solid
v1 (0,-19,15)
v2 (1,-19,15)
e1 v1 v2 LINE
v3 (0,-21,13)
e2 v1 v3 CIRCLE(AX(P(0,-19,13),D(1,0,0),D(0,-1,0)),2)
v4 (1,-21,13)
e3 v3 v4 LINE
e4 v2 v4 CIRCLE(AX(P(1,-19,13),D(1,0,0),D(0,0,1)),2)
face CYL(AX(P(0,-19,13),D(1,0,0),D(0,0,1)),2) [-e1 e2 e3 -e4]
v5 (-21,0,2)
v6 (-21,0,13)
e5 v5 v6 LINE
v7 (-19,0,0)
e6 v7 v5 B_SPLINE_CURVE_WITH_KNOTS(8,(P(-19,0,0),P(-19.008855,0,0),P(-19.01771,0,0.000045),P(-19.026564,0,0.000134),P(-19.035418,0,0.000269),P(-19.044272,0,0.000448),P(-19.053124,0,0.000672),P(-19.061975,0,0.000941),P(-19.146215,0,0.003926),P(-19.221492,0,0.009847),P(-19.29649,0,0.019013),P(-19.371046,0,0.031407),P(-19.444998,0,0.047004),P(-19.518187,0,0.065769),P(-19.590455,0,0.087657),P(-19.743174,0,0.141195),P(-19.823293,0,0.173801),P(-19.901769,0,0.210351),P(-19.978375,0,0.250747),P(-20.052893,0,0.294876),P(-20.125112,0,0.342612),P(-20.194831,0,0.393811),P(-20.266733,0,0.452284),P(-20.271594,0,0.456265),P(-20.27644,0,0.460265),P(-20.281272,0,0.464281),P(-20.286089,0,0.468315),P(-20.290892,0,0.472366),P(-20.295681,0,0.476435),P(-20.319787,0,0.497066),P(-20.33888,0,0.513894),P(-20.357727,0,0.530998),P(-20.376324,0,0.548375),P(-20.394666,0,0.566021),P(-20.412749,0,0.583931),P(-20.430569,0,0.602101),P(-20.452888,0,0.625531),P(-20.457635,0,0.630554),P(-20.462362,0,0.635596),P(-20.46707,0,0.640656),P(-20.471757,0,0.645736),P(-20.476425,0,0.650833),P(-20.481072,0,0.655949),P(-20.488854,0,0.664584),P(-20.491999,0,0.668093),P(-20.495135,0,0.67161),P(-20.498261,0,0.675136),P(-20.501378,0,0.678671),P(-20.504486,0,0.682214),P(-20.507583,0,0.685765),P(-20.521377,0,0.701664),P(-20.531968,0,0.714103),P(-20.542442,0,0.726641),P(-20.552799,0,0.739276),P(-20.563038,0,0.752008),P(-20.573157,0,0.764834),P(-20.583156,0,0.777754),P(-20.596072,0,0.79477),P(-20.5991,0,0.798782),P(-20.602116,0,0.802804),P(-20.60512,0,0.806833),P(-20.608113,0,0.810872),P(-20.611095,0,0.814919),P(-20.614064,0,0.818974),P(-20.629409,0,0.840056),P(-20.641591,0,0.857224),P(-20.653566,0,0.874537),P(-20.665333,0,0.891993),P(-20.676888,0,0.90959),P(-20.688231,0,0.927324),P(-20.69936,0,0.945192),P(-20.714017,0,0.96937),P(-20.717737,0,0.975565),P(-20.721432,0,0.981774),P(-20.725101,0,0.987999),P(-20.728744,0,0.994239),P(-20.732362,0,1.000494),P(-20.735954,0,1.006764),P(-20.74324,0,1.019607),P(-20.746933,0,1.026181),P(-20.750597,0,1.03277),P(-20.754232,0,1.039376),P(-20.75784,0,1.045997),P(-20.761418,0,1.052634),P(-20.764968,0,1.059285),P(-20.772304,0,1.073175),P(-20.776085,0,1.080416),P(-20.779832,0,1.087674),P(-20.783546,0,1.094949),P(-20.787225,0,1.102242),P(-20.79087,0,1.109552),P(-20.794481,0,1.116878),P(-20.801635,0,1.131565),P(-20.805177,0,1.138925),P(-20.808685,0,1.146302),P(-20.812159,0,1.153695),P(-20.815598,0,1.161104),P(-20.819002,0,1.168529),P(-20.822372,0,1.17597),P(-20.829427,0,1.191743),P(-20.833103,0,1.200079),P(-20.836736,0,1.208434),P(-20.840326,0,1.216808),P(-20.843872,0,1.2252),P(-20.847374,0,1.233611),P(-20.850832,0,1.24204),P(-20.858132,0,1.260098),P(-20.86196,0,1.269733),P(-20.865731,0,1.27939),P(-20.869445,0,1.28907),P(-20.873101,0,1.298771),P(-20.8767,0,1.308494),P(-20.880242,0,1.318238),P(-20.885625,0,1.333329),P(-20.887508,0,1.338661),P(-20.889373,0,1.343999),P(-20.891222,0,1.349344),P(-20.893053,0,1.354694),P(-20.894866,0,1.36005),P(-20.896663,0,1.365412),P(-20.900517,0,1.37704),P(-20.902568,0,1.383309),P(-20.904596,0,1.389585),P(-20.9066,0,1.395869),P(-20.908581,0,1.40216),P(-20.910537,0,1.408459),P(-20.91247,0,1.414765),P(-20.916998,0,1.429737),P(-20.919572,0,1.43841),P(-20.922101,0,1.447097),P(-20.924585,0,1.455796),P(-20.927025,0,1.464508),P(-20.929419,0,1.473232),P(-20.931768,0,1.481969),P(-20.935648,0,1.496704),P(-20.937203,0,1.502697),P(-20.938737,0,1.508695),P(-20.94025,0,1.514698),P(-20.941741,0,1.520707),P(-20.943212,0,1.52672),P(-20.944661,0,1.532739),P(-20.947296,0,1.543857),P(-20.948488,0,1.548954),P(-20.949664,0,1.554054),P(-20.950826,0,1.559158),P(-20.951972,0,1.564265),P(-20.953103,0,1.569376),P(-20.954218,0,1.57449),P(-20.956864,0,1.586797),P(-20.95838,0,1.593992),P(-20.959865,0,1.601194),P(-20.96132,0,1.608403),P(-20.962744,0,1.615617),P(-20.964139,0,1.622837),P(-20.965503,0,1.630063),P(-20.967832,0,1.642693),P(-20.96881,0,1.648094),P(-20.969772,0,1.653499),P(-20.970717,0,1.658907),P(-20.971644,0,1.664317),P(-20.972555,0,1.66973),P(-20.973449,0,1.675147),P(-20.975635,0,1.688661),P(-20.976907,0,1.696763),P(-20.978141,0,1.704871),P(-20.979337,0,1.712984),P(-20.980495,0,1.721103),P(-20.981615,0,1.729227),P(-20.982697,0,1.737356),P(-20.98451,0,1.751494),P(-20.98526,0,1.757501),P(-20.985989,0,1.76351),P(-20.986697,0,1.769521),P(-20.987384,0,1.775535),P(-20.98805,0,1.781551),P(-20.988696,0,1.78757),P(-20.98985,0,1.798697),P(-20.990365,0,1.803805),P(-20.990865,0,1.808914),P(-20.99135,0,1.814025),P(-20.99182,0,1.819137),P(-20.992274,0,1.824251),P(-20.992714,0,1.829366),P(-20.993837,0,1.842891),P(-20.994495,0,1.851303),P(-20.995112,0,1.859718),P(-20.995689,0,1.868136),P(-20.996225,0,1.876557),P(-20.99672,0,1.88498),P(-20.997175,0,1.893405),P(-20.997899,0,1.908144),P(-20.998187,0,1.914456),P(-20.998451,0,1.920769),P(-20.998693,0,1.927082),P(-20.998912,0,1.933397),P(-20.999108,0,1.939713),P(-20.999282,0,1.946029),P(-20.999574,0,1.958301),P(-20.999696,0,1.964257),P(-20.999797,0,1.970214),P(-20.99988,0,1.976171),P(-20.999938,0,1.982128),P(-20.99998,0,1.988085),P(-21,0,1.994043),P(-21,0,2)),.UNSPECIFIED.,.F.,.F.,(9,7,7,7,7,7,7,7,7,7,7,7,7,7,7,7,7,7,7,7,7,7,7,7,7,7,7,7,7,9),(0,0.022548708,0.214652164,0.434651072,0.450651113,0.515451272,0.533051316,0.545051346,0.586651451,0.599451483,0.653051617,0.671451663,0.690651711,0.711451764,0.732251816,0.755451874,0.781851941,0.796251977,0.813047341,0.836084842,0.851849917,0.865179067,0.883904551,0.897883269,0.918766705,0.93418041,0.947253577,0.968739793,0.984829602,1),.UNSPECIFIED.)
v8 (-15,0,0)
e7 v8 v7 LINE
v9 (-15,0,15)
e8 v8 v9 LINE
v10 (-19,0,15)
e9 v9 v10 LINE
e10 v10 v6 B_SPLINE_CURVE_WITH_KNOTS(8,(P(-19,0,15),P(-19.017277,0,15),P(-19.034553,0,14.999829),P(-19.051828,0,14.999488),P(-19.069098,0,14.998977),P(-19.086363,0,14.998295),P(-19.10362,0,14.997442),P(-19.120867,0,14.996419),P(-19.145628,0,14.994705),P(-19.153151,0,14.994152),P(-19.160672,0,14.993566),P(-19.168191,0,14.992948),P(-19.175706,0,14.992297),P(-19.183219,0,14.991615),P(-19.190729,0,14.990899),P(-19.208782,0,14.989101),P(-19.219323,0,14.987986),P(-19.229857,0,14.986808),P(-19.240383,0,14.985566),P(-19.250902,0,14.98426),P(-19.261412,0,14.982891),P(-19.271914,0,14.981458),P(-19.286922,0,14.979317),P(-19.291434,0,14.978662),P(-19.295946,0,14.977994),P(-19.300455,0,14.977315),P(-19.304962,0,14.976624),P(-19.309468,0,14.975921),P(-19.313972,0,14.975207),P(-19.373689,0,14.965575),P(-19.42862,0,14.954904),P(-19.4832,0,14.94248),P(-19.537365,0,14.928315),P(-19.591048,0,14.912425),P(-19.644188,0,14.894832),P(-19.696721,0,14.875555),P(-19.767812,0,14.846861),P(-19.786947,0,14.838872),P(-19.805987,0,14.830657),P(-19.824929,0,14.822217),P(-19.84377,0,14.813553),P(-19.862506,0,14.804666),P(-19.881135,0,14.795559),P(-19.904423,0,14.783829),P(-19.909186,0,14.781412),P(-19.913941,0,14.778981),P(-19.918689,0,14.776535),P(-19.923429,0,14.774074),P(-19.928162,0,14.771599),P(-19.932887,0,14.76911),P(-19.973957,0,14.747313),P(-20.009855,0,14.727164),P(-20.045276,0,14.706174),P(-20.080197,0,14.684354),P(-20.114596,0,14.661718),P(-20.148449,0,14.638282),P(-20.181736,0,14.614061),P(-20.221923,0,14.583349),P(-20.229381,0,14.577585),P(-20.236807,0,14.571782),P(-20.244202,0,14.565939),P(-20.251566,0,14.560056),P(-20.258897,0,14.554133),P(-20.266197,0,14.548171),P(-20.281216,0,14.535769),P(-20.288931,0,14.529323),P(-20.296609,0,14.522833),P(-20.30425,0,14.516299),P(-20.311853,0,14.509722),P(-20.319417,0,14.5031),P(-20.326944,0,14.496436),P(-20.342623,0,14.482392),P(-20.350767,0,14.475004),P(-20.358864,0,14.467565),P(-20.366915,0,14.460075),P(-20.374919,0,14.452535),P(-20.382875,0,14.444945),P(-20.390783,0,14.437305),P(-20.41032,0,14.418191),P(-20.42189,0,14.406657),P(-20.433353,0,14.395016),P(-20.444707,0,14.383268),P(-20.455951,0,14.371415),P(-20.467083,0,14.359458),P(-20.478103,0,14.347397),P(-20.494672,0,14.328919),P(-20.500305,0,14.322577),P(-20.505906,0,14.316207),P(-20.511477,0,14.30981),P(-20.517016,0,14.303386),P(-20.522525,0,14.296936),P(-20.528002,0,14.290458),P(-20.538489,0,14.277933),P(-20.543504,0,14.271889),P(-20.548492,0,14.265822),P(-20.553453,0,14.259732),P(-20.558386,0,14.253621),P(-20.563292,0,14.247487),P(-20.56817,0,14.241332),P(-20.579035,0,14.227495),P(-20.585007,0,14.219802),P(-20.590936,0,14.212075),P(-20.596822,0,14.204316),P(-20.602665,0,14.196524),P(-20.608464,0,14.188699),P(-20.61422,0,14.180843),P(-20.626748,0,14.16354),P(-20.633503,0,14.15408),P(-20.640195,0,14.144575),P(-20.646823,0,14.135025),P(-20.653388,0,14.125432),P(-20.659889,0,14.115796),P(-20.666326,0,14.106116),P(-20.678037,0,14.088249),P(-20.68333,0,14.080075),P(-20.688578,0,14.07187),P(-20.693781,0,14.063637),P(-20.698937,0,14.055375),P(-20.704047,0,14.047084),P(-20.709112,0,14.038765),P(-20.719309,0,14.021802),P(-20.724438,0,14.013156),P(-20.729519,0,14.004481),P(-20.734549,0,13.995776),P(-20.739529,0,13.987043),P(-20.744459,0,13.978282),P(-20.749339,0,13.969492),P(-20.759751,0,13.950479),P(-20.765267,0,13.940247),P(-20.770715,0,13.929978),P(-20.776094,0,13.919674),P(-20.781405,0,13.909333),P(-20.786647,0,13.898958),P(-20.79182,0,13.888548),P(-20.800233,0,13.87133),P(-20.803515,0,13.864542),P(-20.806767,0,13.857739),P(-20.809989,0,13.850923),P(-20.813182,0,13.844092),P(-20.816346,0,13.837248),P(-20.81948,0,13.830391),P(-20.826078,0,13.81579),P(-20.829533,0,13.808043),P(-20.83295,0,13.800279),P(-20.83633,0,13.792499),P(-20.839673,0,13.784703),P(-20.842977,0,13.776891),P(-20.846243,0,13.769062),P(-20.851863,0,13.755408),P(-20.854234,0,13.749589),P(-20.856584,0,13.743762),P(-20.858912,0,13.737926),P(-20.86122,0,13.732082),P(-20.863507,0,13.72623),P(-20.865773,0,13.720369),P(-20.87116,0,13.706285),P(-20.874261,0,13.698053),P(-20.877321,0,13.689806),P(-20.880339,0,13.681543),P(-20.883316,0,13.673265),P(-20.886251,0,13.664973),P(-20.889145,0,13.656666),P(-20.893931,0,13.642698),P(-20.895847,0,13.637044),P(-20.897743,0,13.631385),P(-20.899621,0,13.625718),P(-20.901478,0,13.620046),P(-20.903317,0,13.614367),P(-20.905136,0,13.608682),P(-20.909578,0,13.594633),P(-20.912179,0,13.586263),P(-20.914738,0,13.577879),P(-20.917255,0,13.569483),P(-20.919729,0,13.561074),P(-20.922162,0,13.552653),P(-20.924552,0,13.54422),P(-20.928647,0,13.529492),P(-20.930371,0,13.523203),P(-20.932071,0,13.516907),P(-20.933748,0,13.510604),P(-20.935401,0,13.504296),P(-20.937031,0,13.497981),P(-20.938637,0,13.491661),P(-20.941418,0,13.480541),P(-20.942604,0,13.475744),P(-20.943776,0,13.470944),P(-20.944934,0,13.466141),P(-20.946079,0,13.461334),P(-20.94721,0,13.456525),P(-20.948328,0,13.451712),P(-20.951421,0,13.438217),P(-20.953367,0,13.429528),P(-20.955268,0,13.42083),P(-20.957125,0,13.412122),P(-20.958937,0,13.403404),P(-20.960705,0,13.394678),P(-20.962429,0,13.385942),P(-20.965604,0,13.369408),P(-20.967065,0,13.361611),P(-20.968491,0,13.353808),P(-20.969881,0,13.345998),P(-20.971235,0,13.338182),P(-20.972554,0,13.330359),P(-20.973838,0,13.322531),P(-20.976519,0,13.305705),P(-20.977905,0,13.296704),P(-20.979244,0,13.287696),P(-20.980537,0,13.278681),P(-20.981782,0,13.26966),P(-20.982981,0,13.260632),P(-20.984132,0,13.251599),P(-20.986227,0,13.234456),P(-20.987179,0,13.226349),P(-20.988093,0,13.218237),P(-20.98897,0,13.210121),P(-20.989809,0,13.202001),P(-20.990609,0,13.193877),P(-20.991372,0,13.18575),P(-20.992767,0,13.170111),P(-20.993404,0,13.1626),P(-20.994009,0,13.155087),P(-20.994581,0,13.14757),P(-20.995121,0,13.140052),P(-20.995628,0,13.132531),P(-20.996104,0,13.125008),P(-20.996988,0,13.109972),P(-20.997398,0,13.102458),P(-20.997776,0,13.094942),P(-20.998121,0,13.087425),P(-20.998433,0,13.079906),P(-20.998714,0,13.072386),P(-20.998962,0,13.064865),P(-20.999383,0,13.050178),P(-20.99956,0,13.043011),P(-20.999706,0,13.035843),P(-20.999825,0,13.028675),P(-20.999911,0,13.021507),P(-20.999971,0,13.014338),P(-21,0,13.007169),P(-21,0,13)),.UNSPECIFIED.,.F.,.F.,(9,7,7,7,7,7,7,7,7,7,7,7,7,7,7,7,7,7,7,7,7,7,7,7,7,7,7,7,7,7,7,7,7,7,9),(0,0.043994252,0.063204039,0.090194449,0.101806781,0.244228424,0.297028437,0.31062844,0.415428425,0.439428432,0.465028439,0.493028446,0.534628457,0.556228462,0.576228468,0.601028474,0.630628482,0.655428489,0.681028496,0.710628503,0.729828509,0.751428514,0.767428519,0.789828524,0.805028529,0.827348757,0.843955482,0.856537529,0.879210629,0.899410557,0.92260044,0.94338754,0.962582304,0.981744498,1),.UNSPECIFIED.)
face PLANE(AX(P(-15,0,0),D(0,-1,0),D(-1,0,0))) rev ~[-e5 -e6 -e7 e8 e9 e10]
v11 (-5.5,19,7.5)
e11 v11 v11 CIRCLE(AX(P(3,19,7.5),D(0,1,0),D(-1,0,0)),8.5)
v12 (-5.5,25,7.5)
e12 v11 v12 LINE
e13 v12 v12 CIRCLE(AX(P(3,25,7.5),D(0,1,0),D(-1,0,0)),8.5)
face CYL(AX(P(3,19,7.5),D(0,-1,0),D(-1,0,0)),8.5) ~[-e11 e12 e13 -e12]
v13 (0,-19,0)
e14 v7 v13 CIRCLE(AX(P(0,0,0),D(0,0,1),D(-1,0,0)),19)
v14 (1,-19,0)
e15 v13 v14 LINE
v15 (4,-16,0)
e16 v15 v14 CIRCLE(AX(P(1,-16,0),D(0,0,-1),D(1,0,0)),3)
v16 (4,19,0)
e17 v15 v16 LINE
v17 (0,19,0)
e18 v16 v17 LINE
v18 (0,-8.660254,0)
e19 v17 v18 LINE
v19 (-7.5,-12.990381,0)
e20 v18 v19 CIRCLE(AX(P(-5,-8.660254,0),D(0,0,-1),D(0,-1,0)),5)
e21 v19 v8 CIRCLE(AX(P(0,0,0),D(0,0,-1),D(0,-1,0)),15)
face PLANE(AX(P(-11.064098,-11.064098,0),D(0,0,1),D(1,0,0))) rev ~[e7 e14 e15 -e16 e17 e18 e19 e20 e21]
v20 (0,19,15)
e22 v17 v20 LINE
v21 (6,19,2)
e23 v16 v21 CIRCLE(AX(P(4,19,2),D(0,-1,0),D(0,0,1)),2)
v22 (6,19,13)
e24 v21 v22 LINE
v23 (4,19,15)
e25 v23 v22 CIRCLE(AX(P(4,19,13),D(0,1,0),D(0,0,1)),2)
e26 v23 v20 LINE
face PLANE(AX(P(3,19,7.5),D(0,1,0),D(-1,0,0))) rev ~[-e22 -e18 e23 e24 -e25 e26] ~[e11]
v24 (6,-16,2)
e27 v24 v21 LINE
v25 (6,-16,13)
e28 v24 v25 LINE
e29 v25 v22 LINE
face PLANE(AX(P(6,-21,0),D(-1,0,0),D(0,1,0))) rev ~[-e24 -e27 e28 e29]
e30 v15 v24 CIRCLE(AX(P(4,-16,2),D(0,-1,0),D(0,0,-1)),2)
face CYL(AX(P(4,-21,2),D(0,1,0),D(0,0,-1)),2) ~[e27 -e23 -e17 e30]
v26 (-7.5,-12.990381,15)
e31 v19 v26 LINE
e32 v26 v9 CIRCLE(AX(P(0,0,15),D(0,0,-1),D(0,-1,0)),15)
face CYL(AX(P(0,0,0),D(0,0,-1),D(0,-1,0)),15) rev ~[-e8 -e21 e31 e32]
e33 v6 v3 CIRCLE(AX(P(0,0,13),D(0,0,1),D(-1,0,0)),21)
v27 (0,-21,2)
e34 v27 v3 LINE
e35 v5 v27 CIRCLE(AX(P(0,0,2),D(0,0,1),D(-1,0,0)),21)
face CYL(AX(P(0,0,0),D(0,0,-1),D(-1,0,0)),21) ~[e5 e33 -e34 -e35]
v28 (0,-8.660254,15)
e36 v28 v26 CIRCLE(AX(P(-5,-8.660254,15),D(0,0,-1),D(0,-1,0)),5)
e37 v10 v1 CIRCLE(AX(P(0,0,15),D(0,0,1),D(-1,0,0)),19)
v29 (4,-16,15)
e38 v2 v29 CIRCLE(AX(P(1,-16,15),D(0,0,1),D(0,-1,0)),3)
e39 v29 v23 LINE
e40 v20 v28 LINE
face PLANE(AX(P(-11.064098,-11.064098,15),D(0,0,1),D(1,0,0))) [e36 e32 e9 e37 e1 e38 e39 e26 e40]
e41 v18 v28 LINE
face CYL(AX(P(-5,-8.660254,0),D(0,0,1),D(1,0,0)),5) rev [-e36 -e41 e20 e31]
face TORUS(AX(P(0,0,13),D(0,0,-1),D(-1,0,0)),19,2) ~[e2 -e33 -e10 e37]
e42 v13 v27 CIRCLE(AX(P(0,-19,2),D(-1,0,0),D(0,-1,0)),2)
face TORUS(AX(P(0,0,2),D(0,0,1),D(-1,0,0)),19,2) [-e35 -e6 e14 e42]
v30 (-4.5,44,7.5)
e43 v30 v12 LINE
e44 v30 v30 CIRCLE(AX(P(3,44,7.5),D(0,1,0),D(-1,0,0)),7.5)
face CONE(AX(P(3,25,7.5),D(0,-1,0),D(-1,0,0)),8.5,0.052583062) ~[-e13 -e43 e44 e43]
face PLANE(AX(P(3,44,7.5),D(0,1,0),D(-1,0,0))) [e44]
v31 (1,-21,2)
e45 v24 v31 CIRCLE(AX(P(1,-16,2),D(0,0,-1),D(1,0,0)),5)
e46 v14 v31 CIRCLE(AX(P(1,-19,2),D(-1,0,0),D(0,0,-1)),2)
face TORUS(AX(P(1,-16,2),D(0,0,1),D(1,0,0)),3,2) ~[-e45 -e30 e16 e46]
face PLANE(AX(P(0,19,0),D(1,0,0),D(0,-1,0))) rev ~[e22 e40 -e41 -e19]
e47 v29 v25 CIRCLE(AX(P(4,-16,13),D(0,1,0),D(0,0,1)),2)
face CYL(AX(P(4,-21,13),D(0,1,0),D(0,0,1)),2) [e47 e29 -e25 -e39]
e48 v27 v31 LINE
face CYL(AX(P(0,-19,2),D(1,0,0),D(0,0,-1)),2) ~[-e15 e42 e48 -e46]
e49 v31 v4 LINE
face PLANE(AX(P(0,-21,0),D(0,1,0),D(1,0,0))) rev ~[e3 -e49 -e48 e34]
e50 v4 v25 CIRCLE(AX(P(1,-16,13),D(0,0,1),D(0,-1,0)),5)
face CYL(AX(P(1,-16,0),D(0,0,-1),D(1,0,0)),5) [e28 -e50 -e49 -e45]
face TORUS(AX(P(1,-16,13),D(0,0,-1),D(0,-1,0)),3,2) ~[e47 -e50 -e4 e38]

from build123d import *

# Parameters (mm, degrees)
F1_DEPTH    = 15
F2_R        = 8.5
F2_W        = 6
F2_H        = 15
F3_DEPTH    = 25
F4_SIZE2    = 19
F4_SIZE     = 1
F5_R        = 2
F6_R        = 5
F7_T1_DEPTH = 15
F7_T4_ANGLE = 90
F7_T6_ANGLE = 90


# Not quite as in the source:
# - a fillet or chamfer that OpenCascade refuses, or shapes differently, is made with other operations: its cross-section is extruded or revolved along the edge and cut away or added


with BuildPart() as f1:
    # F0 (on Top) → F1 (new body)
    with BuildSketch(Plane.XY):
        with BuildLine():
            ThreePointArc((-21, 0), (-14.8492424049, -14.8492424049), (0, -21))
            Line((0, -21), (0, -15))
            ThreePointArc((0, -15), (-10.6066017178, -10.6066017178), (-15, 0))
            Line((-15, 0), (-21, 0))
        make_face()
        Polygon((0, -15), (0, -21), (6, -21), (6, 19), (0, 19), (0, 0), align=None)
    extrude(amount=F1_DEPTH)

    # F2 (on face) → F3 (join)
    with BuildSketch(Plane(origin=(0, 19, 0), x_dir=(-1, 0, 0), z_dir=(0, 1, 0))):
        with Locations((-3, 7.5)):
            Circle(F2_R)
        with Locations((-3, 7.5)):
            Rectangle(F2_W, F2_H, mode=Mode.SUBTRACT)
        with Locations((-3, 7.5)):
            Rectangle(F2_W, F2_H)
    extrude(amount=F3_DEPTH)

    # F4
    f4_edges = [f1.edges().sort_by_distance(p)[0] for p in [
        (11.5, 44, 7.5),
    ]]
    f4_side = f1.faces().sort_by_distance((3, 44, 7.5))[0]
    chamfer(f4_edges, length=F4_SIZE, length2=F4_SIZE2, reference=f4_side)

    # F5
    f5_edges = [f1.edges().sort_by_distance(p)[0] for p in [
        (6, -1, 15),
        (-14.849242, -14.849242, 15),
        (3, -21, 0),
        (-14.849242, -14.849242, 0),
        (6, -1, 0),
    ]]
    fillet(f5_edges, radius=F5_R)

    # F6
    f6_edges = [f1.edges().sort_by_distance(p)[0] for p in [
        (0, -15, 7.5),
    ]]
    fillet(f6_edges, radius=F6_R)

    # F7: fillet of radius 5 on 1 edges, made by hand

    # F7_s2 → F7_t1 (cut)
    with BuildSketch(Plane.XY):
        with BuildLine():
            ThreePointArc((6, -16), (4.5355339059, -19.5355339059), (1, -21))
            Line((1, -21), (6, -21))
            Line((6, -21), (6, -16))
        make_face()
    extrude(amount=F7_T1_DEPTH, mode=Mode.SUBTRACT)

    # F7_s3 → F7_t4 (revolve, cut)
    with BuildSketch(Plane.XZ.offset(16)):
        with BuildLine():
            ThreePointArc((4, 0), (5.4142135624, 0.5857864376), (6, 2))
            Line((6, 2), (6, 0))
            Line((6, 0), (4, 0))
        make_face()
    revolve(axis=Axis((1, -16, 0), (0, 0, -1)), revolution_arc=F7_T4_ANGLE, mode=Mode.SUBTRACT)

    # F7_s5 → F7_t6 (revolve, cut)
    with BuildSketch(Plane.YZ.offset(1)):
        with BuildLine():
            ThreePointArc((-19, 15), (-20.4142135624, 14.4142135624), (-21, 13))
            Line((-21, 13), (-21, 15))
            Line((-21, 15), (-19, 15))
        make_face()
    revolve(axis=Axis((1, -16, 15), (0, 0, 1)), revolution_arc=F7_T6_ANGLE, mode=Mode.SUBTRACT)


solid = f1.part
